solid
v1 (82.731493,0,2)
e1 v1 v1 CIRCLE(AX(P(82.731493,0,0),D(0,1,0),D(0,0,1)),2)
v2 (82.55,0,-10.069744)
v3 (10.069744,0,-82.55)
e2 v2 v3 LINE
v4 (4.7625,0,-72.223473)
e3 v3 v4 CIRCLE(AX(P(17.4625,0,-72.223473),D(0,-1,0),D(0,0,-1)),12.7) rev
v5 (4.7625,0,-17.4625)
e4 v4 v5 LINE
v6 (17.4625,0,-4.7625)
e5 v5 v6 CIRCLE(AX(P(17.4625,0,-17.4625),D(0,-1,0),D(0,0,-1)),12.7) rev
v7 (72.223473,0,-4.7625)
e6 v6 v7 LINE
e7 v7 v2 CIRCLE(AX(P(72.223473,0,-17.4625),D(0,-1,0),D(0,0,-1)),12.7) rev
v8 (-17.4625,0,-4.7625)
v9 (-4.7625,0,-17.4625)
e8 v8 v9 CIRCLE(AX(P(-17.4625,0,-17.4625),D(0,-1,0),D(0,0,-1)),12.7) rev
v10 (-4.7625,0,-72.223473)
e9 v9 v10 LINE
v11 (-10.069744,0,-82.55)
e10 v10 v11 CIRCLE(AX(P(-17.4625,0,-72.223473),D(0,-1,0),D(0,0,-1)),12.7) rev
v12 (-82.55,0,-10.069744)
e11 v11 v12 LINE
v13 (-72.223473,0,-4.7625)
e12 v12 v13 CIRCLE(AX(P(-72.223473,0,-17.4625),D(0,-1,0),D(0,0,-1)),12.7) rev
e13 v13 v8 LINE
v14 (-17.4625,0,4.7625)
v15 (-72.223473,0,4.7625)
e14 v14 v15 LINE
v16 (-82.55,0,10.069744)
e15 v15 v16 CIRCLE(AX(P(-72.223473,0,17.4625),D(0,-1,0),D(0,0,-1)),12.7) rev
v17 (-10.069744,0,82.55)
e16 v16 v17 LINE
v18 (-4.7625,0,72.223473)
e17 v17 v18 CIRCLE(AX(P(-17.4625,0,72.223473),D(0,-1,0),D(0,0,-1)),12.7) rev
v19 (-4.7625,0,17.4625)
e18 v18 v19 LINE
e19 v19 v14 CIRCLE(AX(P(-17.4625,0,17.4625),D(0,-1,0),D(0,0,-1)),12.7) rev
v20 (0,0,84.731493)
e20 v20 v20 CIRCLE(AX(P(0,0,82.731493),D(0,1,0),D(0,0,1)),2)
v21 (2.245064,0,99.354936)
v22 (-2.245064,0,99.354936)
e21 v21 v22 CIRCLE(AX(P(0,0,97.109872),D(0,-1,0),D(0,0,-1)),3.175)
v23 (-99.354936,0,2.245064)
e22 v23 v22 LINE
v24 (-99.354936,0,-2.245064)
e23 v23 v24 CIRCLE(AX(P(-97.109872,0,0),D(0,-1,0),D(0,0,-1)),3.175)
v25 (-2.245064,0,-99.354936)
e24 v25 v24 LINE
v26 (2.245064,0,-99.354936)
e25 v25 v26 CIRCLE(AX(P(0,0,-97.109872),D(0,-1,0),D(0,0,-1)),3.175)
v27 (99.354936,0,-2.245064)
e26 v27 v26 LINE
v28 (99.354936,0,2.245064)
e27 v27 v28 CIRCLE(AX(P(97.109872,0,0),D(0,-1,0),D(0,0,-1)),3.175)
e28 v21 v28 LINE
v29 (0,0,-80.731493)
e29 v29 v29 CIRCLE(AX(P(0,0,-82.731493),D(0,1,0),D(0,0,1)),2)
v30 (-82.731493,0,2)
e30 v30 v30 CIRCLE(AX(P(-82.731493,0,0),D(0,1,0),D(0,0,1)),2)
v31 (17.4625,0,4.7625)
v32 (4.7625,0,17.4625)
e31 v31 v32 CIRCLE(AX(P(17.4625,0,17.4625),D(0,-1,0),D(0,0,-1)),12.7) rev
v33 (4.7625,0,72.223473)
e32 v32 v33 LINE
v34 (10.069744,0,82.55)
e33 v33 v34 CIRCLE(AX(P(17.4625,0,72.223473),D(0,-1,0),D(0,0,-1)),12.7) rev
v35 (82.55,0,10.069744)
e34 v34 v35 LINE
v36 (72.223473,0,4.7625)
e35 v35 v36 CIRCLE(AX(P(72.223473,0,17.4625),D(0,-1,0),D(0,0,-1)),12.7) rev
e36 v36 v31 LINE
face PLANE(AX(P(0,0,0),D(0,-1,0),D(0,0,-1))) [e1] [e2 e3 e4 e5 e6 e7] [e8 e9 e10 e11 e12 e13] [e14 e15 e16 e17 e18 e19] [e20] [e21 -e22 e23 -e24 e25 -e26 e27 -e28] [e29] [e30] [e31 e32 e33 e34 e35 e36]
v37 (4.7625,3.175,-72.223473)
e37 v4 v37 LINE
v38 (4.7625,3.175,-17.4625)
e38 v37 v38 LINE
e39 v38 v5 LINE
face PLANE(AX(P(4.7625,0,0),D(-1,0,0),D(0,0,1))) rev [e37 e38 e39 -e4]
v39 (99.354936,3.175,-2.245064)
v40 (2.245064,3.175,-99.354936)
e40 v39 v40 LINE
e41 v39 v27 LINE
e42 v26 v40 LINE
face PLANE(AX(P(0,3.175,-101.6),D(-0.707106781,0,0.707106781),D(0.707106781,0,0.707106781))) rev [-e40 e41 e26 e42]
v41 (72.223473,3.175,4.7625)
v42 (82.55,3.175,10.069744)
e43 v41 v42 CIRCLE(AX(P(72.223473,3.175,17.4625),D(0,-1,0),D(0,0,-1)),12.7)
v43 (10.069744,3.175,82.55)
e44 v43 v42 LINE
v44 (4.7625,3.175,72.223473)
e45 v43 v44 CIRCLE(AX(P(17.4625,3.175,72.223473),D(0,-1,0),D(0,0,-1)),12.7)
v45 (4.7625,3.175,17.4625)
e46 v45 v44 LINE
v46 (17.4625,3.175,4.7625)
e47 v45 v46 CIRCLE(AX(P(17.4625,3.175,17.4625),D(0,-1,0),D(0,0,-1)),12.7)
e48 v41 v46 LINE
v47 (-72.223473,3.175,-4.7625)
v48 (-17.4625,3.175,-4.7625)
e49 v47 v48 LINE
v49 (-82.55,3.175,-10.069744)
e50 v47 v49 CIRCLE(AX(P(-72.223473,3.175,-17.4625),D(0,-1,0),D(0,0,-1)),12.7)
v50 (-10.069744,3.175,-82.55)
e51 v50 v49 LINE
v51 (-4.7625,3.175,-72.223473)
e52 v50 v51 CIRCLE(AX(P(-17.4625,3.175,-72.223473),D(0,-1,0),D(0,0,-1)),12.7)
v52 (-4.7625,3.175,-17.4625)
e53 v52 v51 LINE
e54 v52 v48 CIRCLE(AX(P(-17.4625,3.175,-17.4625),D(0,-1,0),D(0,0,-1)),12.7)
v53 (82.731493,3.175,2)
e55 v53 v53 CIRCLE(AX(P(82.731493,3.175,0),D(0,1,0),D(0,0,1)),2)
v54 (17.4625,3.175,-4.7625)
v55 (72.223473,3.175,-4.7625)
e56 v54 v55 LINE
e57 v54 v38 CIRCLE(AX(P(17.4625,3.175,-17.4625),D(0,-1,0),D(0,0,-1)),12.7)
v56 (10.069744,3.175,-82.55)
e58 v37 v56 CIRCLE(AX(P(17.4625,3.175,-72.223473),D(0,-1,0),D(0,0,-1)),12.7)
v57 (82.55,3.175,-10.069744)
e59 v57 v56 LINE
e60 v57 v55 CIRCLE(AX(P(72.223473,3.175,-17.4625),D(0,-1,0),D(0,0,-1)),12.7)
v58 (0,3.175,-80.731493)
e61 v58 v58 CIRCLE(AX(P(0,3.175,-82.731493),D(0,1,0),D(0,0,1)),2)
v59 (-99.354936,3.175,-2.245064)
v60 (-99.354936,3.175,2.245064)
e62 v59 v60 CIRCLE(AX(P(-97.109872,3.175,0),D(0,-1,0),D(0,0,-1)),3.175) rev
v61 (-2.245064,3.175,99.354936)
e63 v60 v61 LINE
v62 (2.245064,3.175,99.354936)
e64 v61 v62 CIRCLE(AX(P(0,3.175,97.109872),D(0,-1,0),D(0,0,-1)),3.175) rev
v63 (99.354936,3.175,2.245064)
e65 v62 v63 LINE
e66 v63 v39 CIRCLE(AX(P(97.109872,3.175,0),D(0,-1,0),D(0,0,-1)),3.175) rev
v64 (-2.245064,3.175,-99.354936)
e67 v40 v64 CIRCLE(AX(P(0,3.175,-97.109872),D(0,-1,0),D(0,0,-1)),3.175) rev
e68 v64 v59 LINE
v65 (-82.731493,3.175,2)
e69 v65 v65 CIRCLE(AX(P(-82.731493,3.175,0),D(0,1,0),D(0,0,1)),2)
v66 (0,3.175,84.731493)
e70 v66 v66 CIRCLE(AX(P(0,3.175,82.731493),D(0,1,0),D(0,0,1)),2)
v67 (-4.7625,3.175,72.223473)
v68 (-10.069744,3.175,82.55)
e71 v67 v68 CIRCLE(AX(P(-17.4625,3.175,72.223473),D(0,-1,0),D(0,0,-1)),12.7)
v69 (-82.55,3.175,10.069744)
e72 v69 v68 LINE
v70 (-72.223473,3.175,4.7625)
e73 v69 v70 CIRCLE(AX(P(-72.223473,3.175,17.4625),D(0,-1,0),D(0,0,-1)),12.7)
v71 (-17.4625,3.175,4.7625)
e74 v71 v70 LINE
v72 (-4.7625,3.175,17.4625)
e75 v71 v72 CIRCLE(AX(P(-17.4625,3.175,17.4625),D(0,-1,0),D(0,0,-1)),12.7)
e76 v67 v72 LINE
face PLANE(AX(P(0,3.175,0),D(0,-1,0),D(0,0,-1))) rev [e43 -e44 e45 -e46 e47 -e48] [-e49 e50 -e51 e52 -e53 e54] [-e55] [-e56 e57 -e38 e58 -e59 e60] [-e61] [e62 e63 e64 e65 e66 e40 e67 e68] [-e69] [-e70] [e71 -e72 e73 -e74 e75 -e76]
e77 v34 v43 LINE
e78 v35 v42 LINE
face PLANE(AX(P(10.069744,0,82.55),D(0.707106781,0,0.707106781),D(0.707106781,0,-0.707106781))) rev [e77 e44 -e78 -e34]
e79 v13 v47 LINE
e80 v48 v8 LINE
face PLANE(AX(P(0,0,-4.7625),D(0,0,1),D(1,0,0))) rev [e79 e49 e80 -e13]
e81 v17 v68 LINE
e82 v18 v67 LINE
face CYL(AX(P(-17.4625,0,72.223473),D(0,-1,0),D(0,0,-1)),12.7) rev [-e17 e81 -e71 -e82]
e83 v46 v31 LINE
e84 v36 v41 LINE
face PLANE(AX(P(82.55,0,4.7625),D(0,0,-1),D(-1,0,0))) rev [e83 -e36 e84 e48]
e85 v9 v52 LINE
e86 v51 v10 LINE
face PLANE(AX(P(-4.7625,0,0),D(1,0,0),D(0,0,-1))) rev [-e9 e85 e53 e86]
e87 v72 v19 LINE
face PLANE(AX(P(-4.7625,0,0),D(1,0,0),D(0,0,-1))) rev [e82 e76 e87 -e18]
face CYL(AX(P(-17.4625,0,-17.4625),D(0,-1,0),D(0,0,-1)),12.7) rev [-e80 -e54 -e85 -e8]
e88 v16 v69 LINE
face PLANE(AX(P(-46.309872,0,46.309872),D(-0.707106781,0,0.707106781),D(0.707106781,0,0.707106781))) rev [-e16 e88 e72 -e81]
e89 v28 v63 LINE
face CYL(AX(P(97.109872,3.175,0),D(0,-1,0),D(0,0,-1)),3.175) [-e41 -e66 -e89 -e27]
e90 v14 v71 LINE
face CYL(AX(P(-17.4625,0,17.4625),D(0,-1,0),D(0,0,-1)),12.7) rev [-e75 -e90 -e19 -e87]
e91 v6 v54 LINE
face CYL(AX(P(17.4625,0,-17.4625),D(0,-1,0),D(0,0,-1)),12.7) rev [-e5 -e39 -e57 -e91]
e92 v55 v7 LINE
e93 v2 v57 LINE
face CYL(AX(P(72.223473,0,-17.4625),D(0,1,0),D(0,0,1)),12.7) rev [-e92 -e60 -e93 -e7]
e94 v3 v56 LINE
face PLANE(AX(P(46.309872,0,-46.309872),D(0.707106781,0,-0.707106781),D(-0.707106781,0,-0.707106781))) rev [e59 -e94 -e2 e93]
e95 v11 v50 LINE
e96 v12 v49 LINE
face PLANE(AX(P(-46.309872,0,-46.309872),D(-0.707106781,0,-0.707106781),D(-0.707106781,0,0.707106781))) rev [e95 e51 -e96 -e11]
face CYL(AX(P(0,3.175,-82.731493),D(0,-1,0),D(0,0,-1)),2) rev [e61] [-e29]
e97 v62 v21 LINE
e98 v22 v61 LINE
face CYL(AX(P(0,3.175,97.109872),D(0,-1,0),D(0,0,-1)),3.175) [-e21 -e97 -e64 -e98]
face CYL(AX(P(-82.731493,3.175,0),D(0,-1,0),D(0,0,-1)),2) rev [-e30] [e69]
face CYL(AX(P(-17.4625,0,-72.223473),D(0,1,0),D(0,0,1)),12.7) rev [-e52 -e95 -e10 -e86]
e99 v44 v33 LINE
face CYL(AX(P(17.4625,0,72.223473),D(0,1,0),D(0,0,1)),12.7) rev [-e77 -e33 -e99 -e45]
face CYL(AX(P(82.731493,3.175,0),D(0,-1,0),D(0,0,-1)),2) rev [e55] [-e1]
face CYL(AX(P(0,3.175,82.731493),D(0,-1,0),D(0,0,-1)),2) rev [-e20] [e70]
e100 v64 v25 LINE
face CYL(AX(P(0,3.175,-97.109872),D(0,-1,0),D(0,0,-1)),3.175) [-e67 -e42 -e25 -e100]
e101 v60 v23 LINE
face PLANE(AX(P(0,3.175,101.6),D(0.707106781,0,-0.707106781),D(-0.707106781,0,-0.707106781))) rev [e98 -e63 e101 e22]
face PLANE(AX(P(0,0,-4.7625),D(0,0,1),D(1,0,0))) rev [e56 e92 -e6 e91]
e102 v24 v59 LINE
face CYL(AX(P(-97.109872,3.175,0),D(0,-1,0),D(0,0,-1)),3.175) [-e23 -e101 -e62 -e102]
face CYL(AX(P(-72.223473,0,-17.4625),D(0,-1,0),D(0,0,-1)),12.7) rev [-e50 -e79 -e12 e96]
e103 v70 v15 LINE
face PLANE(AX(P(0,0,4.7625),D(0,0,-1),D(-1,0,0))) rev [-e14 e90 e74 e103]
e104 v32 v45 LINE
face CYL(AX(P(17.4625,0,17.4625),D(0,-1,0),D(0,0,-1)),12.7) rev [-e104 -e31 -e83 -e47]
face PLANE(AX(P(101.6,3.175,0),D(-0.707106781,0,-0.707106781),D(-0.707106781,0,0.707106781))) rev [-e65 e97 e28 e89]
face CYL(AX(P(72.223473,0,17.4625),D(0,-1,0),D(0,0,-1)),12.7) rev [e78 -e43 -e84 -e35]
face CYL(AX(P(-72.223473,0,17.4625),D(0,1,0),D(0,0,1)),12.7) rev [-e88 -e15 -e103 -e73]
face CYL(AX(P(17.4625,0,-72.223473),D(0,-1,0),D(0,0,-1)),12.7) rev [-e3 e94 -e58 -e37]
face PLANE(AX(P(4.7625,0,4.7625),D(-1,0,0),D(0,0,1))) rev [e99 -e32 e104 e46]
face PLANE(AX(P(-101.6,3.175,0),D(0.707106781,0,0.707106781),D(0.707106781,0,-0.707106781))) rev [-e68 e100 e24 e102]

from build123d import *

# Parameters (mm, degrees)
SKETCH1_R           = 2
BOSS_EXTRUDE1_DEPTH = 3.175
CUT_EXTRUDE1_DEPTH  = 144.719172782
FILLET1_R           = 12.7
FILLET2_R           = 3.175


with BuildPart() as part:
    # Sketch1 → Boss-Extrude1 (new body)
    with BuildSketch(Plane(origin=(0, 0, 0), x_dir=(1, 0, 0), z_dir=(0, 1, 0))):
        Polygon((0, -101.6), (-101.6, 0), (0, 101.6), (101.6, 0), align=None)
        with Locations(Location((0, 82.731493173, 0), (0, 0, 270))):
            Circle(SKETCH1_R, mode=Mode.SUBTRACT)
        with Locations(Location((-82.731493173, 0, 0), (0, 0, 270))):
            Circle(SKETCH1_R, mode=Mode.SUBTRACT)
        with Locations(Location((0, -82.731493173, 0), (0, 0, 270))):
            Circle(SKETCH1_R, mode=Mode.SUBTRACT)
        with Locations(Location((82.731493173, 0, 0), (0, 0, 270))):
            Circle(SKETCH1_R, mode=Mode.SUBTRACT)
    extrude(amount=BOSS_EXTRUDE1_DEPTH)

    # Sketch2 → Cut-Extrude1 (cut, through all)
    with BuildSketch(Plane(origin=(0, 3.175, 0), x_dir=(1, 0, 0), z_dir=(0, 1, 0))):
        Polygon((-4.7625, -4.7625), (-82.55, -4.7625), (-82.55, -10.069743879), (-10.069743879, -82.55), (-4.7625, -82.55), align=None)
        Polygon((-4.7625, 4.7625), (-4.7625, 82.55), (-10.069743879, 82.55), (-82.55, 10.069743879), (-82.55, 4.7625), align=None)
        Polygon((4.7625, 82.55), (4.7625, 4.7625), (82.55, 4.7625), (82.55, 10.069743879), (10.069743879, 82.55), align=None)
        Polygon((4.7625, -4.7625), (4.7625, -82.55), (10.069743879, -82.55), (82.55, -10.069743879), (82.55, -4.7625), align=None)
    extrude(amount=-CUT_EXTRUDE1_DEPTH, mode=Mode.SUBTRACT)

    # Fillet1
    # the kernel refuses this fillet: 12.7 mm, written as the material it adds along each edge
    with BuildSketch(Plane(origin=(4.7625, 3.175, 82.55), x_dir=(0, 0, -1), z_dir=(0, -1, 0)), Plane(origin=(-82.55, 3.175, 4.7625), x_dir=(1, 0, 0), z_dir=(0, -1, 0)), Plane(origin=(-4.7625, 3.175, -82.55), x_dir=(0, 0, 1), z_dir=(0, -1, 0))) as fillet1_piece_1:
        with BuildLine():
            CenterArc((10.326526857, 12.7), FILLET1_R, 215.59885924, 54.40114076)
            Line((0, 5.307243879), (-0.206530537, 5.159388757))
            ThreePointArc((-0.206530537, 5.159388757), (-0.254, 2.653621939), (-0.254, 0))
            Line((-0.254, 0), (0, -0.254))
            Line((0, -0.254), (10.326526857, -0.254))
            Line((10.326526857, -0.254), (10.326526857, 0))
        make_face()
    extrude(amount=3.175)
    with BuildSketch(Plane(origin=(4.7625, 3.175, 4.7625), x_dir=(0, 0, 1), z_dir=(0, -1, 0)), Plane(origin=(-4.7625, 3.175, -4.7625), x_dir=(0, 0, -1), z_dir=(0, -1, 0)), Plane(origin=(-4.7625, 3.175, 4.7625), x_dir=(-1, 0, 0), z_dir=(0, -1, 0))) as fillet1_piece_2:
        with BuildLine():
            CenterArc((FILLET1_R, -FILLET1_R), FILLET1_R, 90, 90)
            Line((0, -FILLET1_R), (-FILLET1_R * 0.02, -FILLET1_R))
            Line((-FILLET1_R * 0.02, -FILLET1_R), (-FILLET1_R * 0.02, FILLET1_R * 0.02))
            Line((-FILLET1_R * 0.02, FILLET1_R * 0.02), (FILLET1_R, FILLET1_R * 0.02))
            Line((FILLET1_R, FILLET1_R * 0.02), (FILLET1_R, 0))
        make_face()
    extrude(amount=3.175)
    with BuildSketch(Plane(origin=(82.55, 3.175, 4.7625), x_dir=(-1, 0, 0), z_dir=(0, -1, 0)), Plane(origin=(-4.7625, 3.175, 82.55), x_dir=(0, 0, -1), z_dir=(0, -1, 0)), Plane(origin=(-82.55, 3.175, -4.7625), x_dir=(1, 0, 0), z_dir=(0, -1, 0)), Plane(origin=(4.7625, 3.175, -82.55), x_dir=(0, 0, 1), z_dir=(0, -1, 0))) as fillet1_piece_3:
        with BuildLine():
            CenterArc((10.326526857, -12.7), FILLET1_R, 90, 54.40114076)
            Line((0, -5.307243879), (-0.206530537, -5.159388757))
            ThreePointArc((-0.206530537, -5.159388757), (-0.254, -2.653621939), (-0.254, 0))
            Line((-0.254, 0), (0, 0.254))
            Line((0, 0.254), (10.326526857, 0.254))
            Line((10.326526857, 0.254), (10.326526857, 0))
        make_face()
    extrude(amount=3.175)
    with BuildSketch(Plane(origin=(82.55, 3.175, -4.7625), x_dir=(0, 0, -1), z_dir=(0, -1, 0))) as fillet1_piece_4:
        with BuildLine():
            CenterArc((12.7, -10.326526857), FILLET1_R, 125.59885924, 54.40114076)
            Line((0, -10.326526857), (-0.254, -10.326526857))
            Line((-0.254, -10.326526857), (-0.254, 0))
            Line((-0.254, 0), (0, 0.254))
            ThreePointArc((0, 0.254), (2.653621939, 0.254), (5.159388757, 0.206530537))
            Line((5.159388757, 0.206530537), (5.307243879, 0))
        make_face()
    extrude(amount=3.175)
    with BuildSketch(Plane(origin=(4.7625, 3.175, -4.7625), x_dir=(0, 0, -1), z_dir=(0, -1, 0))) as fillet1_piece_5:
        with BuildLine():
            CenterArc((FILLET1_R, FILLET1_R), FILLET1_R, 180, 90)
            Line((0, FILLET1_R), (-FILLET1_R * 0.02, FILLET1_R))
            Line((-FILLET1_R * 0.02, FILLET1_R), (-FILLET1_R * 0.02, -FILLET1_R * 0.02))
            Line((-FILLET1_R * 0.02, -FILLET1_R * 0.02), (FILLET1_R, -FILLET1_R * 0.02))
            Line((FILLET1_R, -FILLET1_R * 0.02), (FILLET1_R, 0))
        make_face()
    extrude(amount=3.175)

    # Fillet2
    fillet2_edges = [part.edges().sort_by_distance(p)[0] for p in [
        (0, 1.5875, 101.6),
        (-101.6, 1.5875, 0),
        (0, 1.5875, -101.6),
        (101.6, 1.5875, 0),
    ]]
    fillet(fillet2_edges, radius=FILLET2_R)


solid = part.part
